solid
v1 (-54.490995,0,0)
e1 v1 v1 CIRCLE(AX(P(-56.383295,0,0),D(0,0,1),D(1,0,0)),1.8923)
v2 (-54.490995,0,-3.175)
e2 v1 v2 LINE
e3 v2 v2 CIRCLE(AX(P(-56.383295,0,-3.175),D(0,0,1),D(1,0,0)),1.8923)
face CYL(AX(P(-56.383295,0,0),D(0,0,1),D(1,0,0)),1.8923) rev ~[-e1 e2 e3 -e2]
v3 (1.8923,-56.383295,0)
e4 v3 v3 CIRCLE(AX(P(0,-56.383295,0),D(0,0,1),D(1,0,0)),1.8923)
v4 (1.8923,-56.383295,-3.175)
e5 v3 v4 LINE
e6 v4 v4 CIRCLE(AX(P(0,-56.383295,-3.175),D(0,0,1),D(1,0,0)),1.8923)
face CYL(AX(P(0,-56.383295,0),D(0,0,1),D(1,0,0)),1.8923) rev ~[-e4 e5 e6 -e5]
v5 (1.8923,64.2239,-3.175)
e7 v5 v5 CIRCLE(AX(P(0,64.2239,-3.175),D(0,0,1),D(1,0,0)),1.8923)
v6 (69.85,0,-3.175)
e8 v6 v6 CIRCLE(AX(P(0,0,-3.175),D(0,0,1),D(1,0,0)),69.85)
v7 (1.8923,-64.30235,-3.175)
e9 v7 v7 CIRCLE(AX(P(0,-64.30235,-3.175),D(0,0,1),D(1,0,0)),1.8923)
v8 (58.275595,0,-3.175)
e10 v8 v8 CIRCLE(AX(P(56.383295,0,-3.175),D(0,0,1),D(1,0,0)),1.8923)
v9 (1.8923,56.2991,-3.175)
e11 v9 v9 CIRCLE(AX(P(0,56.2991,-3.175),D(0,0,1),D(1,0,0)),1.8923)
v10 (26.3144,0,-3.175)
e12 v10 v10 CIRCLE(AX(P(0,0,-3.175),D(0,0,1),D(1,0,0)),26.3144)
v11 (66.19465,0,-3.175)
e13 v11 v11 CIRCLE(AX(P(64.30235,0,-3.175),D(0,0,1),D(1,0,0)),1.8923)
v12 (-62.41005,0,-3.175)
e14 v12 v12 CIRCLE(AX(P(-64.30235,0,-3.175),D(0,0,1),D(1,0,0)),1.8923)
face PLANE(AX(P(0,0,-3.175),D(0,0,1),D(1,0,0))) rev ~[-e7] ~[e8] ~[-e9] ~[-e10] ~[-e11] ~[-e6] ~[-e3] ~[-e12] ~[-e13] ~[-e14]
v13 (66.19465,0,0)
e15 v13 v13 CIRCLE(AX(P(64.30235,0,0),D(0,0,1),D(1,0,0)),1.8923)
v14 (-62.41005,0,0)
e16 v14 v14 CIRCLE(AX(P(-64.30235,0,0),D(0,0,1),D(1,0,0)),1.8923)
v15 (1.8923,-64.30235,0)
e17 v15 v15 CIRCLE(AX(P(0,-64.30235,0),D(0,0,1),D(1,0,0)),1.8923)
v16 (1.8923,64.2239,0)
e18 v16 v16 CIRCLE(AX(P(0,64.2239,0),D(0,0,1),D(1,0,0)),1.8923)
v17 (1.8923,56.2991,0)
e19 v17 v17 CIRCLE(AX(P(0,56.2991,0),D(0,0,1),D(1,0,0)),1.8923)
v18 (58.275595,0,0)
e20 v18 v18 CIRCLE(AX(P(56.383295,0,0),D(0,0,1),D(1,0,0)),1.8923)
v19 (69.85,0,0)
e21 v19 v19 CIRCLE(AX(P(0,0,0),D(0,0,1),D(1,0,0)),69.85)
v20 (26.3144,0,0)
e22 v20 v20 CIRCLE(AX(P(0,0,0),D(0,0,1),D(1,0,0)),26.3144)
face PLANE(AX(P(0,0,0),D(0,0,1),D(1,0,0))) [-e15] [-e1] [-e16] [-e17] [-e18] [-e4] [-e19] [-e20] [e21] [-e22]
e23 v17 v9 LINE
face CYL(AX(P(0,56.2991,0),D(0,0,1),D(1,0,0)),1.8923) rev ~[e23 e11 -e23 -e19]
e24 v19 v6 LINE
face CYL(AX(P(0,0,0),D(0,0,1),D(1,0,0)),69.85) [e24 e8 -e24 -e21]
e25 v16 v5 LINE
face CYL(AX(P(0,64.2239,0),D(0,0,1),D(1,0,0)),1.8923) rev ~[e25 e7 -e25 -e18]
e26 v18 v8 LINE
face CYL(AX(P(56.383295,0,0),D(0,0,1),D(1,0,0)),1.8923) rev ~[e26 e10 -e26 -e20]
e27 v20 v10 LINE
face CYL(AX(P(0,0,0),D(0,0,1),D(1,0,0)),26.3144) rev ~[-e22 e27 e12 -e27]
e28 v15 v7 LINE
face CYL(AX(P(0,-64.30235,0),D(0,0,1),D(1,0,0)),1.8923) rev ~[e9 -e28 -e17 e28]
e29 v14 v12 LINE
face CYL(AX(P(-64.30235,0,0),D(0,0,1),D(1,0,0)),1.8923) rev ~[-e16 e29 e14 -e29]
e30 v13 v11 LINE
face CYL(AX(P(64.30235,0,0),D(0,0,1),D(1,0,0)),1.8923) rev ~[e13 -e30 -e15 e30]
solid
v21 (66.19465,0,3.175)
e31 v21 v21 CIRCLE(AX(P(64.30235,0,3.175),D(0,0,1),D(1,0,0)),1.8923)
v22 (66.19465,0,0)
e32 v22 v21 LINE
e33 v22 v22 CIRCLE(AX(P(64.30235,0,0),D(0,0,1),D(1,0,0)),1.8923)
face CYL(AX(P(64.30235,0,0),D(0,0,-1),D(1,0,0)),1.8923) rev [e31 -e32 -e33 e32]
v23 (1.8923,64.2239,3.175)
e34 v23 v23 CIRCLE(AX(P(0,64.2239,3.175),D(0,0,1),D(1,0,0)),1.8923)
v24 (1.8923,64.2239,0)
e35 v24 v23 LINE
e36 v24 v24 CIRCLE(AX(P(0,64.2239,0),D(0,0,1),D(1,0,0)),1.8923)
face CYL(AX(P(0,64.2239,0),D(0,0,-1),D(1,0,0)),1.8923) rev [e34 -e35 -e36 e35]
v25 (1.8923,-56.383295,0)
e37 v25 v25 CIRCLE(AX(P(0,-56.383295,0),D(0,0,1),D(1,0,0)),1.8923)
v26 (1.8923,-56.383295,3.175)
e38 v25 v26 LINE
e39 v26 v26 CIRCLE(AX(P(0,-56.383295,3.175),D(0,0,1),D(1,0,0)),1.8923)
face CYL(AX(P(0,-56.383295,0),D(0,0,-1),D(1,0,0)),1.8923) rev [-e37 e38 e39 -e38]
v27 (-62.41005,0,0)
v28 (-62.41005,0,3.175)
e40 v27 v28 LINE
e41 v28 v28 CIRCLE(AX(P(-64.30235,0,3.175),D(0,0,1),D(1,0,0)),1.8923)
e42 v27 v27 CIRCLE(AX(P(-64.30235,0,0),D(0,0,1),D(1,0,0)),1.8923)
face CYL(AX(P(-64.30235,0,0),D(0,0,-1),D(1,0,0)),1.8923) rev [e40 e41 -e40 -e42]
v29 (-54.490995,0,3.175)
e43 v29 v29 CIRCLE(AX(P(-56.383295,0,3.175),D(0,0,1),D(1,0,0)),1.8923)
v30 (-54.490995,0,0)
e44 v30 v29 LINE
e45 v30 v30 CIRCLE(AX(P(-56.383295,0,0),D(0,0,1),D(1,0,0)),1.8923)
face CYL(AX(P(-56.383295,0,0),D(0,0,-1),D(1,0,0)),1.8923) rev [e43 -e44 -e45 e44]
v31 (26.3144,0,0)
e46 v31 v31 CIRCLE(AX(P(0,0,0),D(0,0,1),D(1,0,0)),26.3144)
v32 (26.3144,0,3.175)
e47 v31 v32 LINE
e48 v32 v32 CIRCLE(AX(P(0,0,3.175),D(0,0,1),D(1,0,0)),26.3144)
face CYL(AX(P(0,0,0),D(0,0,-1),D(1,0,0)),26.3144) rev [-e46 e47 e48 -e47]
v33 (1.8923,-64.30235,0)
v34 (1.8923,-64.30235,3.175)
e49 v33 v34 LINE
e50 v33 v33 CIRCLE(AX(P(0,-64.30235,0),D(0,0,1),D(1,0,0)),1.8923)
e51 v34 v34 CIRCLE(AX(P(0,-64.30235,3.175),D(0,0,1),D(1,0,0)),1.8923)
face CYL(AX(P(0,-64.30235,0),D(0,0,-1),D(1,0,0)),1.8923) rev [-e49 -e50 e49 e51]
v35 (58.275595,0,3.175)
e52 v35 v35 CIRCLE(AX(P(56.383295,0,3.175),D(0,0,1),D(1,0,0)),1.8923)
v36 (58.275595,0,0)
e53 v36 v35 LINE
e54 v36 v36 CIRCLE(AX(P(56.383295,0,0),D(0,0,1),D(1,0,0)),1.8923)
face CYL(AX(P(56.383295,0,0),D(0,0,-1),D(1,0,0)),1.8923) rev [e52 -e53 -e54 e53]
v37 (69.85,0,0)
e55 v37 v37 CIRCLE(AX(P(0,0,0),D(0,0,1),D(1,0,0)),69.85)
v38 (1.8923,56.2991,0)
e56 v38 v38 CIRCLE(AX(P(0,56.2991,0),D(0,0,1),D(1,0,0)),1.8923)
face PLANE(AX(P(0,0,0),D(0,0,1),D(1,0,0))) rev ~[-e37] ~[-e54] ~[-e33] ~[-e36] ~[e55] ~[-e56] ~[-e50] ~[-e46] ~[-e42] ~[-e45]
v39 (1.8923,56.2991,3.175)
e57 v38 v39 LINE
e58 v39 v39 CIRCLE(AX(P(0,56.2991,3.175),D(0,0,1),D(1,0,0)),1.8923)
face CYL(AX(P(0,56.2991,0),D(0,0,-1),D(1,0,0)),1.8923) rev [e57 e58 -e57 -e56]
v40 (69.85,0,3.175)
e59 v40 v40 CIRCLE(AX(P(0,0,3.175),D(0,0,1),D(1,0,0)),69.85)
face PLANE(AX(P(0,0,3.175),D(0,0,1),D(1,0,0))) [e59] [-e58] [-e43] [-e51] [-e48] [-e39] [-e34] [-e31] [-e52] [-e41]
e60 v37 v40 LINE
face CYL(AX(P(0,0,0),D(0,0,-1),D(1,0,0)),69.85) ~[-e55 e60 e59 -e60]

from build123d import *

# Parameters (mm, degrees)
F0_R     = 69.85
F0_R_2   = 1.8923
F0_R_3   = 26.3144
F1_DEPTH = 3.175
F3_DEPTH = 3.175


# Not quite as in the source:
# - a feature names something its author has since deleted; it is built from what else it names


with BuildPart() as f1:
    # F0 (on Top) → F1 (new body)
    with BuildSketch(Plane.XY):
        Circle(F0_R)
        with Locations((0, -64.3023502119)):
            Circle(F0_R_2, mode=Mode.SUBTRACT)
        with Locations((0, -56.38329491)):
            Circle(F0_R_2, mode=Mode.SUBTRACT)
        with Locations((-64.3023502119, 0)):
            Circle(F0_R_2, mode=Mode.SUBTRACT)
        with Locations((-56.38329491, 0)):
            Circle(F0_R_2, mode=Mode.SUBTRACT)
        Circle(F0_R_3, mode=Mode.SUBTRACT)
        with Locations((56.38329491, 0)):
            Circle(F0_R_2, mode=Mode.SUBTRACT)
        with Locations((64.3023502119, 0)):
            Circle(F0_R_2, mode=Mode.SUBTRACT)
        with Locations((0, 56.2991)):
            Circle(F0_R_2, mode=Mode.SUBTRACT)
        with Locations((0, 64.2239)):
            Circle(F0_R_2, mode=Mode.SUBTRACT)
    extrude(amount=-F1_DEPTH)


with BuildPart() as f3:
    # F0 (on Top) → F3 (new body)
    with BuildSketch(Plane.XY):
        Circle(F0_R)
        with Locations((0, -64.3023502119)):
            Circle(F0_R_2, mode=Mode.SUBTRACT)
        with Locations((0, -56.38329491)):
            Circle(F0_R_2, mode=Mode.SUBTRACT)
        with Locations((-64.3023502119, 0)):
            Circle(F0_R_2, mode=Mode.SUBTRACT)
        with Locations((-56.38329491, 0)):
            Circle(F0_R_2, mode=Mode.SUBTRACT)
        Circle(F0_R_3, mode=Mode.SUBTRACT)
        with Locations((56.38329491, 0)):
            Circle(F0_R_2, mode=Mode.SUBTRACT)
        with Locations((64.3023502119, 0)):
            Circle(F0_R_2, mode=Mode.SUBTRACT)
        with Locations((0, 56.2991)):
            Circle(F0_R_2, mode=Mode.SUBTRACT)
        with Locations((0, 64.2239)):
            Circle(F0_R_2, mode=Mode.SUBTRACT)
    extrude(amount=F3_DEPTH)


solid = Compound([f1.part, f3.part])
